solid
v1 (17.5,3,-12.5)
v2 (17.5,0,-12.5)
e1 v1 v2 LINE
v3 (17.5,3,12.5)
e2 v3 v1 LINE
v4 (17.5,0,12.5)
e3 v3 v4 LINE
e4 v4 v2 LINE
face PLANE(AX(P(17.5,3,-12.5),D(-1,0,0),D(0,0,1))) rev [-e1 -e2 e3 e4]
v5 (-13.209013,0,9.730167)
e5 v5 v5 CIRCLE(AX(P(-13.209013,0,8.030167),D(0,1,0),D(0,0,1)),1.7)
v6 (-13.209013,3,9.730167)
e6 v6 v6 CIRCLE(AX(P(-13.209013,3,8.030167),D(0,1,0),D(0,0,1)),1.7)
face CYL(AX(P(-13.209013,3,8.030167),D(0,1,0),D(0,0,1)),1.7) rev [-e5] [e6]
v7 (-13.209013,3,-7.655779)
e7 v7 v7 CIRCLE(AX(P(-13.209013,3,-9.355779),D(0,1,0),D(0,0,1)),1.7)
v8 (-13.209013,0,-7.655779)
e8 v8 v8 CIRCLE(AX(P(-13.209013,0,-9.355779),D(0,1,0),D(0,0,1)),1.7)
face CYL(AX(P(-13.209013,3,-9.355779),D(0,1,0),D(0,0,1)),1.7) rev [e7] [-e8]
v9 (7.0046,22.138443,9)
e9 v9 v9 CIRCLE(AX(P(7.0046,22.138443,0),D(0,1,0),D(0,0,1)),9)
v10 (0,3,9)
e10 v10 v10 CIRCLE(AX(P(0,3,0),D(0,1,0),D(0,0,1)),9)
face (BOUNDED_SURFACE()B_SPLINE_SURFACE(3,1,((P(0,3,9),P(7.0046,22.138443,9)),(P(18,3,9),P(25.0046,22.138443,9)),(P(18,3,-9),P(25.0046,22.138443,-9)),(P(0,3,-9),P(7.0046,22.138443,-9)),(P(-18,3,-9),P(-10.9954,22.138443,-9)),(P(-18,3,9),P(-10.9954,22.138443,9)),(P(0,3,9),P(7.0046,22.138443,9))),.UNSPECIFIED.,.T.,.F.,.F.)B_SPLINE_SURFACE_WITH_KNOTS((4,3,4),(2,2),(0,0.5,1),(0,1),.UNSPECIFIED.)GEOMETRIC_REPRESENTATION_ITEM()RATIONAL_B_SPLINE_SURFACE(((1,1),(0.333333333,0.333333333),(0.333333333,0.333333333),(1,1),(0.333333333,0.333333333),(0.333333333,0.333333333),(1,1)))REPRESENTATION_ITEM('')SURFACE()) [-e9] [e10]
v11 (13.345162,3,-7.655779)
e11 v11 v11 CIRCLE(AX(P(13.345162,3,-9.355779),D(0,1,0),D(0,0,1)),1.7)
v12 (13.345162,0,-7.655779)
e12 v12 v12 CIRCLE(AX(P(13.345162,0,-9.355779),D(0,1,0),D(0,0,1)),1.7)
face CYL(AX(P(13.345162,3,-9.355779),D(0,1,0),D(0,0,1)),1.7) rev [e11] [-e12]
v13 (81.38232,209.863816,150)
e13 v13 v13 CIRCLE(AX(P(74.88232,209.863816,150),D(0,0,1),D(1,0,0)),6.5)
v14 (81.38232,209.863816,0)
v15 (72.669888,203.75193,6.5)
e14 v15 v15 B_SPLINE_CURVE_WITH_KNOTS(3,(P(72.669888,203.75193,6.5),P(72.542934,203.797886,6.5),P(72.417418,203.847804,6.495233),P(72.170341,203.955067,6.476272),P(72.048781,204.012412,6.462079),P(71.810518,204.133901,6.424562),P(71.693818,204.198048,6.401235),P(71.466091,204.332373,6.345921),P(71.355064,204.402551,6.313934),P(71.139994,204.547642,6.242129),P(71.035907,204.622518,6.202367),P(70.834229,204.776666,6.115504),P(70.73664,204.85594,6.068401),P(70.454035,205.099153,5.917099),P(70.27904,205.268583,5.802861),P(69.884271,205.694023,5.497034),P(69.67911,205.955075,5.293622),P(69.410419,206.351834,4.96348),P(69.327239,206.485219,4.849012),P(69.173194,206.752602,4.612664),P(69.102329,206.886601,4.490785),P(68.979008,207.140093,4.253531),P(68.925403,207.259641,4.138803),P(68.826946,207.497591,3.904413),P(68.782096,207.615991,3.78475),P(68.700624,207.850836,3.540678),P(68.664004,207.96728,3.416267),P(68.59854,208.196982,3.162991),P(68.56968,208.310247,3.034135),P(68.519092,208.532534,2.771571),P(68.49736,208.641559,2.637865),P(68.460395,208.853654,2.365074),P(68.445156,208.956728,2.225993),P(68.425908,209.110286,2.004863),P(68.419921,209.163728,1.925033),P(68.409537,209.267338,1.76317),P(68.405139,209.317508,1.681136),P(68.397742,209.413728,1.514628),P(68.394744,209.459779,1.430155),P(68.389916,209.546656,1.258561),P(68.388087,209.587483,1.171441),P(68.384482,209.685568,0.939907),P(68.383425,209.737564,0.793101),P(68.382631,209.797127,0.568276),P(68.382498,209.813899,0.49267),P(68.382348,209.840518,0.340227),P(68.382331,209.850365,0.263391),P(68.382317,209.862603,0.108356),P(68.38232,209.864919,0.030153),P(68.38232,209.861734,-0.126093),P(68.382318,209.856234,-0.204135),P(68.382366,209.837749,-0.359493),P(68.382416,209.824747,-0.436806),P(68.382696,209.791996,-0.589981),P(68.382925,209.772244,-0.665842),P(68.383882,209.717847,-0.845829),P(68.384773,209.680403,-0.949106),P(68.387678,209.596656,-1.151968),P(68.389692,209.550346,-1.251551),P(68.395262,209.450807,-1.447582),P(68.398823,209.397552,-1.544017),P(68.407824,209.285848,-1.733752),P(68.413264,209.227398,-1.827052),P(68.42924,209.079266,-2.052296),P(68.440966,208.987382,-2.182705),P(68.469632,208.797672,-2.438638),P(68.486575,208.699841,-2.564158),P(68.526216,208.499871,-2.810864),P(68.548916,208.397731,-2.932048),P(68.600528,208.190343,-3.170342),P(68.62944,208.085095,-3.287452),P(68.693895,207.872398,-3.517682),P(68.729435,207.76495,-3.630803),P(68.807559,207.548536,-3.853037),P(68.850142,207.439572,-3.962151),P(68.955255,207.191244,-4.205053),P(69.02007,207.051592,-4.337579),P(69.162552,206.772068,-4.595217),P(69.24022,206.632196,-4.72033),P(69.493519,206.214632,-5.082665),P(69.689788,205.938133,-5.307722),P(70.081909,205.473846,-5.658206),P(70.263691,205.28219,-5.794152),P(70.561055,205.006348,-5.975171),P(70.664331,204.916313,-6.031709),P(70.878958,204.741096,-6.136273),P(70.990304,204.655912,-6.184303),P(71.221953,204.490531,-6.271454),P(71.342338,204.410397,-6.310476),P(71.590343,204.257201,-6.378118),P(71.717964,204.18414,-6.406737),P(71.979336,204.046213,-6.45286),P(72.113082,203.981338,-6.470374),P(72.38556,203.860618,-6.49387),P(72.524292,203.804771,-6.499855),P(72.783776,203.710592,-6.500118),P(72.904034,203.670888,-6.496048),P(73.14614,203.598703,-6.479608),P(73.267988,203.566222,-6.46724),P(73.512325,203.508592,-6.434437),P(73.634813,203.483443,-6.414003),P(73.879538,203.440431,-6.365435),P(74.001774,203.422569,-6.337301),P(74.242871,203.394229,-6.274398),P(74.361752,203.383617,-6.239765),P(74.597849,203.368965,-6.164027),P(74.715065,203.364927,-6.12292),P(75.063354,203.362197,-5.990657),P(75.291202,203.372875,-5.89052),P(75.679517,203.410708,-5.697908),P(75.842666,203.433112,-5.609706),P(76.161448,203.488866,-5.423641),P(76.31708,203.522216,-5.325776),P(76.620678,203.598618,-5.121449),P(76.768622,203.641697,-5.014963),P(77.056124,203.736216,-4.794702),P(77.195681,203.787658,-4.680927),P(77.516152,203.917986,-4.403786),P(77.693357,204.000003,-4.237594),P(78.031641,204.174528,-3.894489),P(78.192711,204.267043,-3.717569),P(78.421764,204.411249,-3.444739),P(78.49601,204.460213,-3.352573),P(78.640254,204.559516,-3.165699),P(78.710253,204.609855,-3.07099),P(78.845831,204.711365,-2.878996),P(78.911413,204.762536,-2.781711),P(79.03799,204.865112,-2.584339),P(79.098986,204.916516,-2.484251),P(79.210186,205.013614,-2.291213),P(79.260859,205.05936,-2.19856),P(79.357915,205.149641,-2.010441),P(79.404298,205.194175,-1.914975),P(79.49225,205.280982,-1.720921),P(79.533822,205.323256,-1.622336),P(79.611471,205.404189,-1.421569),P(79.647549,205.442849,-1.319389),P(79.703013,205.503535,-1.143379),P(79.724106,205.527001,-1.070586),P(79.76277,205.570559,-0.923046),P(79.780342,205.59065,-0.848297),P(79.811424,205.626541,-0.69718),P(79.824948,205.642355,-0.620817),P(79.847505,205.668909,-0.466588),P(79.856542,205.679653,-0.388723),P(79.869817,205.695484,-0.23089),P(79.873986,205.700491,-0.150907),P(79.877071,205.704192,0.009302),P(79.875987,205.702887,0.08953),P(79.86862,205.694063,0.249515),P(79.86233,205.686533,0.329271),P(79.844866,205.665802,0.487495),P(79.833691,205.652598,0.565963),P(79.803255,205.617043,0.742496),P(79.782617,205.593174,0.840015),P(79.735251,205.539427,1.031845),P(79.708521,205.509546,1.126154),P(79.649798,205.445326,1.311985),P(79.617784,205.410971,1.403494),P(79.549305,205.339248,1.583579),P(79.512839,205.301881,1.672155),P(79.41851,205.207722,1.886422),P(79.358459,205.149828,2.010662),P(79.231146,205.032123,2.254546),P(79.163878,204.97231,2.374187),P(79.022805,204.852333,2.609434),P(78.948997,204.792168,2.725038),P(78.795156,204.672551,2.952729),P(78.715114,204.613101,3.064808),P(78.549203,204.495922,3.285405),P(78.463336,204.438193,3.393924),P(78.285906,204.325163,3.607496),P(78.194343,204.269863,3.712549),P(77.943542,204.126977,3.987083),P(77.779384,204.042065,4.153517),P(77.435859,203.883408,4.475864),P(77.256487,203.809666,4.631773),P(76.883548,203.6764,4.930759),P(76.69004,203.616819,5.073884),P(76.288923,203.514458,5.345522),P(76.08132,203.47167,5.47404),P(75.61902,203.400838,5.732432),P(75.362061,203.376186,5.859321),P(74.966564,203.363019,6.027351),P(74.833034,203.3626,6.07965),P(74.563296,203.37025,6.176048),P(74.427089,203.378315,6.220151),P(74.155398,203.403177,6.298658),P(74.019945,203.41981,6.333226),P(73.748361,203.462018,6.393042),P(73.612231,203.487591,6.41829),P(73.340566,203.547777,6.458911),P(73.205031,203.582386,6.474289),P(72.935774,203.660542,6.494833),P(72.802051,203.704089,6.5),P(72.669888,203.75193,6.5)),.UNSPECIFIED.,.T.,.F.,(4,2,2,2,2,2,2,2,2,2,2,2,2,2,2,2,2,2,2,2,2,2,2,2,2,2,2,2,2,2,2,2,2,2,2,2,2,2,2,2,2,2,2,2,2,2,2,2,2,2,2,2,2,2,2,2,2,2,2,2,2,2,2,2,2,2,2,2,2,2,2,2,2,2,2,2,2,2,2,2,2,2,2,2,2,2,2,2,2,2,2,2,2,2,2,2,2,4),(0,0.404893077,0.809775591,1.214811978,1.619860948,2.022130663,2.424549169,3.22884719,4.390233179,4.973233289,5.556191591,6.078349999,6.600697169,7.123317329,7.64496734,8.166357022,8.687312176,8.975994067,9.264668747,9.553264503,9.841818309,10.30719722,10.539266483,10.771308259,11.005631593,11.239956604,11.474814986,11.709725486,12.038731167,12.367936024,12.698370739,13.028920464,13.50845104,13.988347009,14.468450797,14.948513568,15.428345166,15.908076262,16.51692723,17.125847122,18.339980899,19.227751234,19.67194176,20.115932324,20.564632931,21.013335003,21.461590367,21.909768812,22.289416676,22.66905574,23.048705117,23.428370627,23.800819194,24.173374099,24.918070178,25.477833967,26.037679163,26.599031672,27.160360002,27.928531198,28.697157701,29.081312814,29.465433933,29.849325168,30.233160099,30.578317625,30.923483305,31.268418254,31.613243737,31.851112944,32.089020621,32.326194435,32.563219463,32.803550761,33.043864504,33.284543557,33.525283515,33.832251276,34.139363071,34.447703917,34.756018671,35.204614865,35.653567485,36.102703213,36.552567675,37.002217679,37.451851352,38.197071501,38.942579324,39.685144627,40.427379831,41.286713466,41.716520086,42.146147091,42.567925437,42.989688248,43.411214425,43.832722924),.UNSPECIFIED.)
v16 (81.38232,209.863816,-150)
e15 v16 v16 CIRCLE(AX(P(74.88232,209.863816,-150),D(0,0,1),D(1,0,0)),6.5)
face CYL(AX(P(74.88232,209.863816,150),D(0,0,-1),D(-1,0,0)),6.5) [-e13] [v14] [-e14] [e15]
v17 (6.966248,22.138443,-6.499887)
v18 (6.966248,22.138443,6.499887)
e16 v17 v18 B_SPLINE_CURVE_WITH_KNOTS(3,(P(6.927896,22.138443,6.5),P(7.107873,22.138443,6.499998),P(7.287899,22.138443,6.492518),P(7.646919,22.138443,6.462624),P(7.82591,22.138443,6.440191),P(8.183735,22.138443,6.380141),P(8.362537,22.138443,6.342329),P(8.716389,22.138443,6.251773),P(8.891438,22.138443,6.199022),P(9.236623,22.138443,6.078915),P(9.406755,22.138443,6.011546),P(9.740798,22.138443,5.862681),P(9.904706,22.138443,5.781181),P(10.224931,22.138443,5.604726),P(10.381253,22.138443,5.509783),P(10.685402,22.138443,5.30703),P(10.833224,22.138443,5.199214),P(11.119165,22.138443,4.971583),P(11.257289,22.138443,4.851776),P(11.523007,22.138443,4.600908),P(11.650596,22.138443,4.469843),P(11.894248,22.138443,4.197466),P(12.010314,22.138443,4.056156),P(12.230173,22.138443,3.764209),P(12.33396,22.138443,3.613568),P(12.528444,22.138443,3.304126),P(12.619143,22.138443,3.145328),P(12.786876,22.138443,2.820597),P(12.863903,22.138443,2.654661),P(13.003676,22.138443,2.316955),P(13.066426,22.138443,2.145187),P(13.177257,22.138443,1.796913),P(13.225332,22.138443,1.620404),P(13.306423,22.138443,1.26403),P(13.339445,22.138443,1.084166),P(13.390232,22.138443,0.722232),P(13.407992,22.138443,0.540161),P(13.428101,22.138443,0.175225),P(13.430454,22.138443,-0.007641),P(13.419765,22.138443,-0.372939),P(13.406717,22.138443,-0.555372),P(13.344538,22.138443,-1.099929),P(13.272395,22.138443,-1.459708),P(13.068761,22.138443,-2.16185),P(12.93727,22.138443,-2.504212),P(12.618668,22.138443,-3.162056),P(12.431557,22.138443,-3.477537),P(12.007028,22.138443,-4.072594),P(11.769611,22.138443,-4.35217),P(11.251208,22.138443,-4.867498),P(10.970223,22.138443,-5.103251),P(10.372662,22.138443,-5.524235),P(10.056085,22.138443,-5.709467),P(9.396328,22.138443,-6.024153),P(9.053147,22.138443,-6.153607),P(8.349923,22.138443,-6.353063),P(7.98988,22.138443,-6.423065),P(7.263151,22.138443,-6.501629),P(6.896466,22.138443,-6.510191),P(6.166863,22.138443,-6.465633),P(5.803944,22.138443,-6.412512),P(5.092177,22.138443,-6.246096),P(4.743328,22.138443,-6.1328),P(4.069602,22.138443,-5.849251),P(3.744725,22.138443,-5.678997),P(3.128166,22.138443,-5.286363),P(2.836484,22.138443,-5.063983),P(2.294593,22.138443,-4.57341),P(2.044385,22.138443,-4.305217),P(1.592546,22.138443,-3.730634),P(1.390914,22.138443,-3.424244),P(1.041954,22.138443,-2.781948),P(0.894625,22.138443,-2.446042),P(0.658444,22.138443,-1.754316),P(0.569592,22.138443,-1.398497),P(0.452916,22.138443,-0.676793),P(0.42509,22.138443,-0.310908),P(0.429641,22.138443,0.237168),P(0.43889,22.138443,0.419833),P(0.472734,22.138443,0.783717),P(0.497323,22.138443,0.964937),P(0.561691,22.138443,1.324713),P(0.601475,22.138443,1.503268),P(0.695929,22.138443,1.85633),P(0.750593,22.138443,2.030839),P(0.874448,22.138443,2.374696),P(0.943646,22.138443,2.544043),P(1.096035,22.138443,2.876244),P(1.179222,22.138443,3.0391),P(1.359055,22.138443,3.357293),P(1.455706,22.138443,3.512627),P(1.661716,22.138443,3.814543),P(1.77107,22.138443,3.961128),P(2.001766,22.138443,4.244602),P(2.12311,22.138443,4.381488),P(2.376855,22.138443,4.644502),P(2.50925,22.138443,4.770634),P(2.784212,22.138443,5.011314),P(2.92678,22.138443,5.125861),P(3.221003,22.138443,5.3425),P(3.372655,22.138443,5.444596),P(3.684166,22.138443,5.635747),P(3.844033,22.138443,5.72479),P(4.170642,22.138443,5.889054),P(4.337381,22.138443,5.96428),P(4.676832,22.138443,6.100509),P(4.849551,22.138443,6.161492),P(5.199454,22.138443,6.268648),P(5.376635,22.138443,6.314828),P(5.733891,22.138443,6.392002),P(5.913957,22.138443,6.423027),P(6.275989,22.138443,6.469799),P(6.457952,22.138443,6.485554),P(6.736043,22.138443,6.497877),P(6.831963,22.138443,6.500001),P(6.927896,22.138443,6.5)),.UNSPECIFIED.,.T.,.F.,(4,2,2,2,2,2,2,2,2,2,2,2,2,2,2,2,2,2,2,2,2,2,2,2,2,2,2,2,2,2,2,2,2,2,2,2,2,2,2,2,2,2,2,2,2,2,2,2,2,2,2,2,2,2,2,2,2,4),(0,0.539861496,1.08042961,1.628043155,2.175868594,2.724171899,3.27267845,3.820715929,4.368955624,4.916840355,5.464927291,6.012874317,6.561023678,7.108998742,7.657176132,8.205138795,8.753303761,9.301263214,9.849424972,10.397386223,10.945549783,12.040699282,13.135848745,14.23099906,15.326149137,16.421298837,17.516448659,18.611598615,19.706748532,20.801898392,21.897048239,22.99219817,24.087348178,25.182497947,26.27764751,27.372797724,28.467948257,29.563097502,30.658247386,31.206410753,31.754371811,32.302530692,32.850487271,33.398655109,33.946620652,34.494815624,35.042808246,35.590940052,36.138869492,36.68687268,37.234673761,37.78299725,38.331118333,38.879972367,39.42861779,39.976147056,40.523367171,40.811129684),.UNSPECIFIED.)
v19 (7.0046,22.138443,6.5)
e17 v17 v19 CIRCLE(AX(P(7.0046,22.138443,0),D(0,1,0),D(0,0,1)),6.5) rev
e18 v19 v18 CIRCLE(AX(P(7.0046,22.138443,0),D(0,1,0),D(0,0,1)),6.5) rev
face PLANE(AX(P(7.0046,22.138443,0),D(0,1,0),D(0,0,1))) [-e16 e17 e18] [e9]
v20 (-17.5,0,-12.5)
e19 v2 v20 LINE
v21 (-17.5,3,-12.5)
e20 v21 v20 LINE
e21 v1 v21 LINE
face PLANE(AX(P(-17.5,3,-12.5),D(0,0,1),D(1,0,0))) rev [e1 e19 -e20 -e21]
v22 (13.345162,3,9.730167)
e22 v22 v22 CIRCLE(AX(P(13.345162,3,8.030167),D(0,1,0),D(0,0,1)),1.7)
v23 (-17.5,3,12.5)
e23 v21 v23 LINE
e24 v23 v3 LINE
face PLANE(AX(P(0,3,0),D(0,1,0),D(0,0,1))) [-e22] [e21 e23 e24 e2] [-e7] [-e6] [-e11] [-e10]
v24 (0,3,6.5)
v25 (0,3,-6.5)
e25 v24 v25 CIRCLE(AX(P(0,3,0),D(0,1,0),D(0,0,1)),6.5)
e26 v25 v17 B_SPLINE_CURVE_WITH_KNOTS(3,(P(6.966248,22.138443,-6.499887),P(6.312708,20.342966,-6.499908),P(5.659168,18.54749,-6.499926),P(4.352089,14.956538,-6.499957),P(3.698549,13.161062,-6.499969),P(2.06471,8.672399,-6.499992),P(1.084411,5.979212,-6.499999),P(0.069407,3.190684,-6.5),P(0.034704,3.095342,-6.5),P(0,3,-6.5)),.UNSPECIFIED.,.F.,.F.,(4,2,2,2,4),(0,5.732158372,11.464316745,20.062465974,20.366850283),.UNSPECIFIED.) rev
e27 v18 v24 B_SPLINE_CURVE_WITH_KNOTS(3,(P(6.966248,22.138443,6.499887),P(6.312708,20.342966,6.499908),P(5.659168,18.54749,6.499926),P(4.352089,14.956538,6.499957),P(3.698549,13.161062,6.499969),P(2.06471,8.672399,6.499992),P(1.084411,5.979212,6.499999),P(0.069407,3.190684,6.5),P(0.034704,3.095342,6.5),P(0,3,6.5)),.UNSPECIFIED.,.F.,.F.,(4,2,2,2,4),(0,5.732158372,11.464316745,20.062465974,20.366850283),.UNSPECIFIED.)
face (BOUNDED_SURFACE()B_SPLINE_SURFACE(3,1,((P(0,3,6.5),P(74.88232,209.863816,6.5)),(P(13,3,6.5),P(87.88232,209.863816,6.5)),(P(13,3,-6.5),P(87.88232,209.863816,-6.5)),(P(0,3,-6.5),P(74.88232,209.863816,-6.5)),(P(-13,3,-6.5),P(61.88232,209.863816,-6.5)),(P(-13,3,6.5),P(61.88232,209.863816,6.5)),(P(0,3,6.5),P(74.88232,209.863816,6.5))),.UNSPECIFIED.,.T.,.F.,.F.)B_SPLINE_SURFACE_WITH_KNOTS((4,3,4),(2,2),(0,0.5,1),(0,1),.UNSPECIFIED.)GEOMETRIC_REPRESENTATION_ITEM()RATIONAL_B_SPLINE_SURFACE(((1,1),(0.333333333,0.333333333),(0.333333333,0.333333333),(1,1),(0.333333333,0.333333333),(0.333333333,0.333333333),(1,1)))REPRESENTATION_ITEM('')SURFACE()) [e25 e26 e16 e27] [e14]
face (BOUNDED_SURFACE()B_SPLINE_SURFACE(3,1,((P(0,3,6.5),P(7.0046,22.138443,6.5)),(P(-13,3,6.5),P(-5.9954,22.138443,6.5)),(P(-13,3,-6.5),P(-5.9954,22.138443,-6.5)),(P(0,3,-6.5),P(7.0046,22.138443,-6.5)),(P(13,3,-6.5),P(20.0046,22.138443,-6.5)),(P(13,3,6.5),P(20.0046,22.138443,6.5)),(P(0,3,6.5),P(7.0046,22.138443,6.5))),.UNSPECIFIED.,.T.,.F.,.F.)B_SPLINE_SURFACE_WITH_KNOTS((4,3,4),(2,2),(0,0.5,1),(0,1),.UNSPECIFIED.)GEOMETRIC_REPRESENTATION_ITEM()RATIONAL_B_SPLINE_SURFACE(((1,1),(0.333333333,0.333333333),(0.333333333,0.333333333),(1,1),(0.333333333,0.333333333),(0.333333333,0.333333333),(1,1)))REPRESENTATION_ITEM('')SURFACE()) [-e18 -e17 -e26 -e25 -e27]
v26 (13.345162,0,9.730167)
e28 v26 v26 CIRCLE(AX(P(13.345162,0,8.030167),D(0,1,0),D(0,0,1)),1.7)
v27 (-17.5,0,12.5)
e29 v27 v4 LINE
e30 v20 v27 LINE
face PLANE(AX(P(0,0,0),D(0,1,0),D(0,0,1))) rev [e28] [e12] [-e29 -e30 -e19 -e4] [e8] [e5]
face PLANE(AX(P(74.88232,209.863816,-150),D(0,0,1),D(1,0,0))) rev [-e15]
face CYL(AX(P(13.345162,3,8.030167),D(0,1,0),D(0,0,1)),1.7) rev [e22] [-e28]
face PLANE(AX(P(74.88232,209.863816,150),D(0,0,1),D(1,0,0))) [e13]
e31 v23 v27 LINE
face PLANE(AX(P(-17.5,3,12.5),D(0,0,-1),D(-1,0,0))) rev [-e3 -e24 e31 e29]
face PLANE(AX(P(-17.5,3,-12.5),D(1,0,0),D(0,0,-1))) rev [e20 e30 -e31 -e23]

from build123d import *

# Parameters (mm, degrees)
IZIM1_W                     = 35
IZIM1_H                     = 25
Y_KSEKLIK_EKSTR_ZYON1_DEPTH = 3
IZIM2_R                     = 9
IZIM2_R_2                   = 6.5
IZIM9_R                     = 6.5
IZIM13_R                    = 6.5
Y_KSEKLIK_EKSTR_ZYON3_DEPTH = 150
M3_BO_LUKLU_DELIK1_D        = 3.4
M3_BO_LUKLU_DELIK1_DEPTH    = 3


with BuildPart() as part:
    # Çizim1 → Yükseklik-Ekstrüzyon1 (new body)
    with BuildSketch(Plane(origin=(0, 0, 0), x_dir=(1, 0, 0), z_dir=(0, 1, 0))):
        Rectangle(IZIM1_W, IZIM1_H)
    extrude(amount=Y_KSEKLIK_EKSTR_ZYON1_DEPTH)

    # Süpür1: sweep along a path in Çizim5
    with BuildLine(Plane.XY) as s_p_r1_path:
        Line((0, 3), (7.004599808, 22.138442505))
    # Çizim2 → Süpür1 (sweep)
    with BuildSketch(Plane(origin=(0, 3, 0), x_dir=(1, 0, 0), z_dir=(0, 1, 0))):
        Circle(IZIM2_R)
        Circle(IZIM2_R_2, mode=Mode.SUBTRACT)
    sweep(path=s_p_r1_path.line)

    # Süpür2: sweep along a path in Çizim11
    with BuildLine(Plane.XY) as s_p_r2_path:
        Line((0, 3), (74.882319817, 209.863815538))
    # Çizim9 → Süpür2 (sweep)
    with BuildSketch(Plane(origin=(0, 3, 0), x_dir=(1, 0, 0), z_dir=(0, 1, 0))):
        Circle(IZIM9_R)
    sweep(path=s_p_r2_path.line)

    # Çizim13 → Yükseklik-Ekstrüzyon3 (add, symmetric)
    with BuildSketch(Plane.XY):
        with Locations((74.882319817, 209.863815538)):
            Circle(IZIM13_R)
    extrude(amount=Y_KSEKLIK_EKSTR_ZYON3_DEPTH, both=True)

    # M3 Boşluklu Delik1
    with Locations(Plane(origin=(0, 3, 0), x_dir=(1, 0, 0), z_dir=(0, 1, 0))):
        with Locations((-13.209013164, -8.030166901), (-13.209013164, 9.355779361), (13.345161769, -8.030166901), (13.345161769, 9.355779361)):
            Hole(M3_BO_LUKLU_DELIK1_D / 2, depth=M3_BO_LUKLU_DELIK1_DEPTH)


solid = part.part
